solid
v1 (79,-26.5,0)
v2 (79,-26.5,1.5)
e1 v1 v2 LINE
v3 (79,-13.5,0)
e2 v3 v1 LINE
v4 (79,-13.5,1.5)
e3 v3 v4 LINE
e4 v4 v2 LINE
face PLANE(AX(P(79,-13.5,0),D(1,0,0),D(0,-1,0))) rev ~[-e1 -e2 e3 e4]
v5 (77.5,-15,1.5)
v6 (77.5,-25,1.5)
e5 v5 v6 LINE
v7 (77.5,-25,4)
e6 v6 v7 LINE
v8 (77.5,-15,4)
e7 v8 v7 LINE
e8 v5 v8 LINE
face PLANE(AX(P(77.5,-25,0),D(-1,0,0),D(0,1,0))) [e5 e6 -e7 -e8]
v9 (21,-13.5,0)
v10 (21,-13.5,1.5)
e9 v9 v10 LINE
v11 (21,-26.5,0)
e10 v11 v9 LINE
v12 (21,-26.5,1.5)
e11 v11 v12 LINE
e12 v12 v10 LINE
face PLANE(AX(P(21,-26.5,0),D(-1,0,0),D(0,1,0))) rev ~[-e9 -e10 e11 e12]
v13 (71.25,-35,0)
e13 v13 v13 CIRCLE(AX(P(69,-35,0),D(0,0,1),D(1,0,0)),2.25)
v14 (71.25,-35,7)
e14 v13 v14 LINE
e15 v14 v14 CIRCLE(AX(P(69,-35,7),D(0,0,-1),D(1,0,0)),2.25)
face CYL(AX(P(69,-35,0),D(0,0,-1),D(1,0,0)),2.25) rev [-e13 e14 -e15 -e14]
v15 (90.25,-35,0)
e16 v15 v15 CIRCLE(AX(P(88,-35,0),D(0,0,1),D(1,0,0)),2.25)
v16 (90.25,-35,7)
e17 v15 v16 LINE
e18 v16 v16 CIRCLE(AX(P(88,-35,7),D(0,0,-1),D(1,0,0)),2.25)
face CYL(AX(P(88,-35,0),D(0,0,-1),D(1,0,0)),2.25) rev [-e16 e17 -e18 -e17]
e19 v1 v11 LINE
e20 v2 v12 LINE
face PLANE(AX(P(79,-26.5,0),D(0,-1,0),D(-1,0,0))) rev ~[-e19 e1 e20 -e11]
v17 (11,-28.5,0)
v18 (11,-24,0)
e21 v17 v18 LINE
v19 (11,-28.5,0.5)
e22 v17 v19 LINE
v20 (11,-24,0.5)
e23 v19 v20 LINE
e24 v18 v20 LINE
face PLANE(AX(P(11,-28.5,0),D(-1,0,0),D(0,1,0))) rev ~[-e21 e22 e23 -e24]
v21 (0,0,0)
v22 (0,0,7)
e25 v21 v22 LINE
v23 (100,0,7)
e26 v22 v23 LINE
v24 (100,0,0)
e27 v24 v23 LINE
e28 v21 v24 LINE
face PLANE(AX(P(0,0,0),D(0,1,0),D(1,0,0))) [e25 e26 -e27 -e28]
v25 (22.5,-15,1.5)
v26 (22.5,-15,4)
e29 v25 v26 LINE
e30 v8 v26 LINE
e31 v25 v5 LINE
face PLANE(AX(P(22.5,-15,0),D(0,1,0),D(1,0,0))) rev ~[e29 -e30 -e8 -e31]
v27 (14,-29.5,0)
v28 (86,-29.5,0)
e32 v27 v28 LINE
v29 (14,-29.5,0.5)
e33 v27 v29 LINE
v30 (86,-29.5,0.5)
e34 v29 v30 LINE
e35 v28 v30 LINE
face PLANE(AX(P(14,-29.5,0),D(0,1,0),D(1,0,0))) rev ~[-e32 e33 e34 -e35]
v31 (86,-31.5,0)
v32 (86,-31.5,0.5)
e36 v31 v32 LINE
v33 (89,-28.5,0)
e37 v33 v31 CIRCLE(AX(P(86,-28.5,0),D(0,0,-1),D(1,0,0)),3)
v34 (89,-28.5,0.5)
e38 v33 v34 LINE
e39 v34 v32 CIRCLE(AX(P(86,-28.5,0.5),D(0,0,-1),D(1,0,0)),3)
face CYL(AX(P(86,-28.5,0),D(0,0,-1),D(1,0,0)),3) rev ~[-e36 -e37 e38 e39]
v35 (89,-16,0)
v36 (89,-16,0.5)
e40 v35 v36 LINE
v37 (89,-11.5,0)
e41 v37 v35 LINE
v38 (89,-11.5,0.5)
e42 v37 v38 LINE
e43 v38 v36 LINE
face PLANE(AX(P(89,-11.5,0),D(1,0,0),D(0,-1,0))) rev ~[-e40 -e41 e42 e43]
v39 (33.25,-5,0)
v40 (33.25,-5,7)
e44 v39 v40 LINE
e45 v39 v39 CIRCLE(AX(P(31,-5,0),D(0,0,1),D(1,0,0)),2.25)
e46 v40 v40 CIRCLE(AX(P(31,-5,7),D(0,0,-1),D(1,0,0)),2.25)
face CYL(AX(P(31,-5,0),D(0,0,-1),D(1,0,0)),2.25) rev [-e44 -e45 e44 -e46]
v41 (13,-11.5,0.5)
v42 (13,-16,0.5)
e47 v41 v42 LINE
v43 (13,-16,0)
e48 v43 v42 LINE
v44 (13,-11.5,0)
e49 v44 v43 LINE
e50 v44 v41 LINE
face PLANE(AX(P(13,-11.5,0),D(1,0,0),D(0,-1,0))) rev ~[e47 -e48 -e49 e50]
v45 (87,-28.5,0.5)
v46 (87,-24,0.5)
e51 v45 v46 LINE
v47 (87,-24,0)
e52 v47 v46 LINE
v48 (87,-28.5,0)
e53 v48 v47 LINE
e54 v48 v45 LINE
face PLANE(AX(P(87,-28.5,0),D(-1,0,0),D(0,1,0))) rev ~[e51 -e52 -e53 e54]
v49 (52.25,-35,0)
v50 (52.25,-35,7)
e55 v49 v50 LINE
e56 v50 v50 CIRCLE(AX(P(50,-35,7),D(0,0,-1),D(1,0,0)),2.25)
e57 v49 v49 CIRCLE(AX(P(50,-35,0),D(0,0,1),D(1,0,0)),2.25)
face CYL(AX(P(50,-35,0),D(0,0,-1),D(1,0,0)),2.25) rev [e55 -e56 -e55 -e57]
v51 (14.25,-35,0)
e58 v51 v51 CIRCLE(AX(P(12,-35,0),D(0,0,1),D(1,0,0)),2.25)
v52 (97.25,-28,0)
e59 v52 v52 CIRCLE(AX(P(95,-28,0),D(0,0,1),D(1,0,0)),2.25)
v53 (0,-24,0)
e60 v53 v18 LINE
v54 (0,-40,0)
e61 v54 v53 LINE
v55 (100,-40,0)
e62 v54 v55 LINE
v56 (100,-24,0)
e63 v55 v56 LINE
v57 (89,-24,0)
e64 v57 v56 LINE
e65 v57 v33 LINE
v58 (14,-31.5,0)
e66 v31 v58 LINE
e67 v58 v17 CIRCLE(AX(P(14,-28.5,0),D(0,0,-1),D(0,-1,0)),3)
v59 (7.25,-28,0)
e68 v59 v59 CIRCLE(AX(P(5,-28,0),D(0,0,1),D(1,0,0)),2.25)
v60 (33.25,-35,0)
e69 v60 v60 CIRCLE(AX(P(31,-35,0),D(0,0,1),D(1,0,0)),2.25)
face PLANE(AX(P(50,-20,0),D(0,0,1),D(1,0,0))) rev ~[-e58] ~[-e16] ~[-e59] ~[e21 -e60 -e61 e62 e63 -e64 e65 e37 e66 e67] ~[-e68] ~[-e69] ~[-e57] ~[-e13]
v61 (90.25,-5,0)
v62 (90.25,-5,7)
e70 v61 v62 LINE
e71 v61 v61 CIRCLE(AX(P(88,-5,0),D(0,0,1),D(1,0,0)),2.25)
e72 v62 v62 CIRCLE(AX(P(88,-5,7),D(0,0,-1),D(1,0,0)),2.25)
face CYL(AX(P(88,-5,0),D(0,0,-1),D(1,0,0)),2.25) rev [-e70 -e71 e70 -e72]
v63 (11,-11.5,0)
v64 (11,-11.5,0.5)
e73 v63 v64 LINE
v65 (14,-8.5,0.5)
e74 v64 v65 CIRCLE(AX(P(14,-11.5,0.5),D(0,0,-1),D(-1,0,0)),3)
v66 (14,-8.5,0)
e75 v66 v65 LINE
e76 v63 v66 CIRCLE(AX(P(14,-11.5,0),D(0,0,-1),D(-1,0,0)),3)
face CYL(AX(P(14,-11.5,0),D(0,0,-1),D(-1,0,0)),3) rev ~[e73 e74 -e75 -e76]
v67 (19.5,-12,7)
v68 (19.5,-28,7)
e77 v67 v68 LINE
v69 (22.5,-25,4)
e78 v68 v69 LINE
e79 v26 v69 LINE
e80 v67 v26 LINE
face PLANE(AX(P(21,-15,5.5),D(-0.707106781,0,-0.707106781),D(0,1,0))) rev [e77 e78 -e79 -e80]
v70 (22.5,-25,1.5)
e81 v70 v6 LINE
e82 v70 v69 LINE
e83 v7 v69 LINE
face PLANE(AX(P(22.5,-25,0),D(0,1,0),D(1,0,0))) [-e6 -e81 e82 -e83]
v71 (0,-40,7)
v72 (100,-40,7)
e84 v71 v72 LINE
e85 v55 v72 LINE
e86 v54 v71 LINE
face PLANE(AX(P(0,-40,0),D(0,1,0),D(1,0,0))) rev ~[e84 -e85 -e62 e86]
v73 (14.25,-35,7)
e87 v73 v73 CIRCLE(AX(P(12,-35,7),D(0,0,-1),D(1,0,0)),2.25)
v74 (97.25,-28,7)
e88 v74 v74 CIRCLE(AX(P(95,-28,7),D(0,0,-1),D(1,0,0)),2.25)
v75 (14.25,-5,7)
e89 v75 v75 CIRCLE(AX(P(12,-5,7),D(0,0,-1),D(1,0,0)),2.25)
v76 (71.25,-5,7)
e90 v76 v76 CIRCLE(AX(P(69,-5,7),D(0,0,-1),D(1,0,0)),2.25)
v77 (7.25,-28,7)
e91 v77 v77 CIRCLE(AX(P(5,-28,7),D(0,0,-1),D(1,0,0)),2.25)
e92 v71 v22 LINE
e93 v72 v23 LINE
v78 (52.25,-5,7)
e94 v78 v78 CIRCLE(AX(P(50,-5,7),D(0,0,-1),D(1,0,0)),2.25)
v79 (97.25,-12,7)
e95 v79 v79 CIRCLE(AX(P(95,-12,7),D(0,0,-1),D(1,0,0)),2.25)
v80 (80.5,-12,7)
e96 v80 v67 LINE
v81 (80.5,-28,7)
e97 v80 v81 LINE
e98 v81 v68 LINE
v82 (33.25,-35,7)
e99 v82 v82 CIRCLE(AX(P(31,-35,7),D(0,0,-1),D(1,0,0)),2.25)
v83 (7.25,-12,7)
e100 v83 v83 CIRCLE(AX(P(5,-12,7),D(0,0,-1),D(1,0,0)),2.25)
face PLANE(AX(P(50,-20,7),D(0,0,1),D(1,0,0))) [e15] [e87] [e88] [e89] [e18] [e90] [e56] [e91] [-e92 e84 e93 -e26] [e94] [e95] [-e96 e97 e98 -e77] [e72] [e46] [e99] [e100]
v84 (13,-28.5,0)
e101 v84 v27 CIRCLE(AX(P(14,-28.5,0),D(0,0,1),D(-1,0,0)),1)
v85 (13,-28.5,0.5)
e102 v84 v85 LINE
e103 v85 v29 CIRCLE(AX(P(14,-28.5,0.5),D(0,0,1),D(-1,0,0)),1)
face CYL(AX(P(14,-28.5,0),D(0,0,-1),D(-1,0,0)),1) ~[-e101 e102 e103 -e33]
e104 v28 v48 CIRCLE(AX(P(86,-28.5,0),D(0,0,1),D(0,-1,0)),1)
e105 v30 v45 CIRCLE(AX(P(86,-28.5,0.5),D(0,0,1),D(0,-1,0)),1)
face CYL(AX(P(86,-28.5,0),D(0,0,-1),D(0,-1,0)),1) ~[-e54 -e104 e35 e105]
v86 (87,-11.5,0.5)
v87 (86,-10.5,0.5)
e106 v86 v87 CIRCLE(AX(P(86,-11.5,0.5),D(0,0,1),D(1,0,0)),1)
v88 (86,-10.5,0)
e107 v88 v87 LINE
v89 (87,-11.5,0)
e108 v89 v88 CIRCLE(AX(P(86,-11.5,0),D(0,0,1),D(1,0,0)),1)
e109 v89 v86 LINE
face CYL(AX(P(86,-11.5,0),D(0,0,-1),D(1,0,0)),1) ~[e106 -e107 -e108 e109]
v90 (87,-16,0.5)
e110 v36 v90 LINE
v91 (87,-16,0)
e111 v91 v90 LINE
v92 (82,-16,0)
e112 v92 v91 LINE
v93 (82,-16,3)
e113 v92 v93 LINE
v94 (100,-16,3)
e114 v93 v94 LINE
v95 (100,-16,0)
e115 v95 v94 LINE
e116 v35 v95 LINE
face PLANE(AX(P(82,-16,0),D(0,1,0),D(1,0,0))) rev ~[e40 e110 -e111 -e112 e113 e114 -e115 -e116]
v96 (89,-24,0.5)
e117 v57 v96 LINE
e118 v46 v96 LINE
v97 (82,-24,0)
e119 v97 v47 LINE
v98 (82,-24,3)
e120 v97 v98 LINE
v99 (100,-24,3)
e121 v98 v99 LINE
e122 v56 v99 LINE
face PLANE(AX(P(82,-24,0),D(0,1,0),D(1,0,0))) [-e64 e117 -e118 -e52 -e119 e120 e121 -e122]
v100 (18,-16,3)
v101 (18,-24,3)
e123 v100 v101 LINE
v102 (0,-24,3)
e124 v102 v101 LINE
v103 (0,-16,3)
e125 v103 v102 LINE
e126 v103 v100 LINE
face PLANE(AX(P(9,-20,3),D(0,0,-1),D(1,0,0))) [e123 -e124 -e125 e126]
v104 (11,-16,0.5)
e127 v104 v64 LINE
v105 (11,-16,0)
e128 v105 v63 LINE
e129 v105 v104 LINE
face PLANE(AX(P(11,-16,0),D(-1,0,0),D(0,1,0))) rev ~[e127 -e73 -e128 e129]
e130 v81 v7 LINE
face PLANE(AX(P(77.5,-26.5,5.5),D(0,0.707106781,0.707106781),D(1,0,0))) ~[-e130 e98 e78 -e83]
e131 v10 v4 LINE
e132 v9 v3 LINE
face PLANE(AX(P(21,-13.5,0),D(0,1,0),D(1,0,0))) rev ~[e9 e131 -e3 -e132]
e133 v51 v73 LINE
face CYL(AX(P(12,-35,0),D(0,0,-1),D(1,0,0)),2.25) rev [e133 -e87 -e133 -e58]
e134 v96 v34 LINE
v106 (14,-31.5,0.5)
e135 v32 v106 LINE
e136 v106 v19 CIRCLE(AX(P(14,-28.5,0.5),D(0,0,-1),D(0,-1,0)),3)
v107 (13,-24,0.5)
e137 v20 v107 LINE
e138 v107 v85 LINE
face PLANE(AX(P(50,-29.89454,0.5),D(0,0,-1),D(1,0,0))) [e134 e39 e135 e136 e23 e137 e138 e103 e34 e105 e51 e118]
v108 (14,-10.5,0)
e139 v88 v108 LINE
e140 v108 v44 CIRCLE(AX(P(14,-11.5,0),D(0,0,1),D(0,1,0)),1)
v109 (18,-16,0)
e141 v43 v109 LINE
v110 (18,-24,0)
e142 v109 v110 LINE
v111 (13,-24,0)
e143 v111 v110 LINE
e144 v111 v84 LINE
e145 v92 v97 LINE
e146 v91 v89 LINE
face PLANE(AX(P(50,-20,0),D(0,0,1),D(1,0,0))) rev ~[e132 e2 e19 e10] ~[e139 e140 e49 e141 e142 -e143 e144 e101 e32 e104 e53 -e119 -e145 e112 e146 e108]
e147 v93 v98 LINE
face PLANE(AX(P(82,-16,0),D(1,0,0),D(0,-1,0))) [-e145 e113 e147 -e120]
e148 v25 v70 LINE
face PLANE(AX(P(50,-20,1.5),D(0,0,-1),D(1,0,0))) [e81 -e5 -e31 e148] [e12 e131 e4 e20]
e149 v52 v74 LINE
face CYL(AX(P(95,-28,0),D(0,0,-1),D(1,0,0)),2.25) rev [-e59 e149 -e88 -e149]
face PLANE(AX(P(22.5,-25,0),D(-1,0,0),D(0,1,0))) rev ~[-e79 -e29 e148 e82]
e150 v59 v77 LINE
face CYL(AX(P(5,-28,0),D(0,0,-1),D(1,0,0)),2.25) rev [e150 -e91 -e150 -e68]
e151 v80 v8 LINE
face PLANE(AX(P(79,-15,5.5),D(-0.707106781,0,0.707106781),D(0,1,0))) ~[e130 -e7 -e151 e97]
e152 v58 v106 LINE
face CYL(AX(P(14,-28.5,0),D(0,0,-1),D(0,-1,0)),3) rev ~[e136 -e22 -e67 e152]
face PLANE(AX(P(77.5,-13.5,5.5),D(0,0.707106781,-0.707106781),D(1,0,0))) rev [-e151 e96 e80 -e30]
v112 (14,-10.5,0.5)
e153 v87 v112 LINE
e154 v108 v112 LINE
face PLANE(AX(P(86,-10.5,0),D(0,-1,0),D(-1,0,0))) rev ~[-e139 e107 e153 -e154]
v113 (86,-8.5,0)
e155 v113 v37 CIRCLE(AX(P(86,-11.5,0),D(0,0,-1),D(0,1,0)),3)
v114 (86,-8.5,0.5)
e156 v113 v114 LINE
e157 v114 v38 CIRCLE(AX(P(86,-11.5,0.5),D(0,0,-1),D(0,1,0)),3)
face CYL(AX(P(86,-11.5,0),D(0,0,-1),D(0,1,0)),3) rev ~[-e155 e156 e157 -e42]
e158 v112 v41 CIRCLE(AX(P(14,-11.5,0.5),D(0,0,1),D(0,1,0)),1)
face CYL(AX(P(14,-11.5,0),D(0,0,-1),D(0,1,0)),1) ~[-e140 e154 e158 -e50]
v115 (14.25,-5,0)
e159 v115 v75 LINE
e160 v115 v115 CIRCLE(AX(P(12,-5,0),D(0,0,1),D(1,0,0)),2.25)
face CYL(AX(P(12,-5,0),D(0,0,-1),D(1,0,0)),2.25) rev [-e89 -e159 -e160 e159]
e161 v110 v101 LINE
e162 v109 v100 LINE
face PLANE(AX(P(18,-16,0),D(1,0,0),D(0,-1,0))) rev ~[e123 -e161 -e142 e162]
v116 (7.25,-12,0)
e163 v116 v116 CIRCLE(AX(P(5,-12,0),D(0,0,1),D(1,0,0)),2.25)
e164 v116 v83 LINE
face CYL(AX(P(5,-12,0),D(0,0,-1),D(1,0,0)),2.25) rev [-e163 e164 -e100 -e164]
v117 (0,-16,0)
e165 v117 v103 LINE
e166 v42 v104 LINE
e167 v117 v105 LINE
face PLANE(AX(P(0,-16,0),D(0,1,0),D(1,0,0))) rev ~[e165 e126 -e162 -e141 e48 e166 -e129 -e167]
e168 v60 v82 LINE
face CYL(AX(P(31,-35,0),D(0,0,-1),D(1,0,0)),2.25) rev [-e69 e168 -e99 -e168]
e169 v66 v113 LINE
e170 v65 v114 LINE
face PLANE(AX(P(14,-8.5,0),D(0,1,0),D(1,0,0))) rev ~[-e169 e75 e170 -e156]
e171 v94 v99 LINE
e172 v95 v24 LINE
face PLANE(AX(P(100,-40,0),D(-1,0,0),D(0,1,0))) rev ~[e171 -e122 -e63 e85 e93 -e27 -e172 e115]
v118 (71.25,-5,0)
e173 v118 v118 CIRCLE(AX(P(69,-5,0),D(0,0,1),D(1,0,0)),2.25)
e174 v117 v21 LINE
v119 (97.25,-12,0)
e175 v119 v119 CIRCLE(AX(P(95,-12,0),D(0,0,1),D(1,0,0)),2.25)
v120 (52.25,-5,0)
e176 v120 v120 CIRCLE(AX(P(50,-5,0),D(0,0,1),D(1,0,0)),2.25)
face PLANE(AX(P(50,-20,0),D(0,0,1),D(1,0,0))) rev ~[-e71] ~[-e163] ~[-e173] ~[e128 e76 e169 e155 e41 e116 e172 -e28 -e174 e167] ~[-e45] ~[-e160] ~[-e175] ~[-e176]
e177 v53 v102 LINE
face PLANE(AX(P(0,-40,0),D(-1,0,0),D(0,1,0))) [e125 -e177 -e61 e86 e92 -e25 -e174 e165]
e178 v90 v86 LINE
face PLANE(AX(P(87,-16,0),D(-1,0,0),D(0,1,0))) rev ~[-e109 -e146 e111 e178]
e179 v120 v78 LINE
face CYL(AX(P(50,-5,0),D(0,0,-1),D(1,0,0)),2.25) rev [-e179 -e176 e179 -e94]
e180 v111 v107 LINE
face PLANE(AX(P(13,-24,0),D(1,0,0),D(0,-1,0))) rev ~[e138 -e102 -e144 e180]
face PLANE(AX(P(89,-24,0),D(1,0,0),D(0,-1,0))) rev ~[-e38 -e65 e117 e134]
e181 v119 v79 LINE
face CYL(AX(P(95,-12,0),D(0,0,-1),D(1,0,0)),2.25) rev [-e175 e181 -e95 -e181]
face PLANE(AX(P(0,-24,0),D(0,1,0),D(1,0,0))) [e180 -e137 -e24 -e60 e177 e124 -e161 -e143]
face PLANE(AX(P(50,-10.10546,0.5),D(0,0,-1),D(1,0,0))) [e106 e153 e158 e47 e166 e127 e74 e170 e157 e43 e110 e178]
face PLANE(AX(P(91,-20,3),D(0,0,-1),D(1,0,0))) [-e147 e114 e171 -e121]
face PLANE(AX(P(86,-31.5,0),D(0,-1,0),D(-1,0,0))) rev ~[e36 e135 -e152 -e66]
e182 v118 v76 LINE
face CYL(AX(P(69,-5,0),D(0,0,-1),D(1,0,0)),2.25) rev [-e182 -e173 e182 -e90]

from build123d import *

# Parameters (mm, degrees)
F0_W      = 100
F0_H      = 40
F1_DEPTH  = 7
F2_W      = 55
F2_H      = 10
F3_DEPTH  = 8
F4_SIZE   = 3
F5_R      = 2.25
F6_DEPTH  = 18.9
F7_W      = 18
F7_H      = 8
F8_DEPTH  = 3
F9_W      = 55
F9_H      = 10
F10_DEPTH = 1.5
F12_DEPTH = 0.5


# Not quite as in the source:
# - a feature names something its author has since deleted; it is built from what else it names


with BuildPart() as f1:
    # F0 (on Top) → F1 (new body)
    with BuildSketch(Plane.XY):
        with Locations((50, -20)):
            Rectangle(F0_W, F0_H)
    extrude(amount=F1_DEPTH)

    # F2 (on Top) → F3 (cut)
    with BuildSketch(Plane.XY):
        with Locations((50, -20)):
            Rectangle(F2_W, F2_H)
    extrude(amount=F3_DEPTH, mode=Mode.SUBTRACT)

    # F4
    f4_edges = [f1.edges().sort_by_distance(p)[0] for p in [
        (50, -15, 7),
        (22.5, -20, 7),
        (50, -25, 7),
        (77.5, -20, 7),
    ]]
    chamfer(f4_edges, length=F4_SIZE)

    # F5 (on Top) → F6 (cut)
    with BuildSketch(Plane.XY):
        with Locations((12, -35)):
            Circle(F5_R)
        with Locations((31, -35)):
            Circle(F5_R)
        with Locations((50, -35)):
            Circle(F5_R)
        with Locations((69, -35)):
            Circle(F5_R)
        with Locations((88, -35)):
            Circle(F5_R)
        with Locations((95, -28)):
            Circle(F5_R)
        with Locations((95, -12)):
            Circle(F5_R)
        with Locations((88, -5)):
            Circle(F5_R)
        with Locations((69, -5)):
            Circle(F5_R)
        with Locations((50, -5)):
            Circle(F5_R)
        with Locations((31, -5)):
            Circle(F5_R)
        with Locations((12, -5)):
            Circle(F5_R)
        with Locations((5, -12)):
            Circle(F5_R)
        with Locations((5, -28)):
            Circle(F5_R)
    extrude(amount=F6_DEPTH, mode=Mode.SUBTRACT)

    # F7 (on face) → F8 (cut)
    with BuildSketch(Plane(origin=(0, 0, 0), x_dir=(1, 0, 0), z_dir=(0, 0, -1))):
        with Locations((9, 20)):
            Rectangle(F7_W, F7_H)
        with Locations((91, 20)):
            Rectangle(F7_W, F7_H)
    extrude(amount=-F8_DEPTH, mode=Mode.SUBTRACT)

    # F9 (on face) → F10 (cut)
    with BuildSketch(Plane(origin=(0, 0, 0), x_dir=(1, 0, 0), z_dir=(0, 0, -1))):
        Polygon((21, 13.5), (77.5, 13.5), (79, 13.5), (79, 26.5), (21, 26.5), align=None)
        with Locations((50, 20)):
            Rectangle(F9_W, F9_H, mode=Mode.SUBTRACT)
    extrude(amount=-F10_DEPTH, mode=Mode.SUBTRACT)

    # F11 (on face) → F12 (cut)
    with BuildSketch(Plane(origin=(0, 0, 0), x_dir=(1, 0, 0), z_dir=(0, 0, -1))):
        with BuildLine():
            Line((14, 8.5), (16, 8.5))
            Line((16, 8.5), (84, 8.5))
            Line((84, 8.5), (86, 8.5))
            ThreePointArc((86, 8.5), (88.1213203436, 9.3786796564), (89, 11.5))
            Line((89, 11.5), (89, 16))
            Line((89, 16), (87, 16))
            Line((87, 16), (87, 11.5))
            ThreePointArc((87, 11.5), (86.7071067812, 10.7928932188), (86, 10.5))
            Line((86, 10.5), (84, 10.5))
            Line((84, 10.5), (16, 10.5))
            Line((16, 10.5), (14, 10.5))
            ThreePointArc((14, 10.5), (13.2928932188, 10.7928932188), (13, 11.5))
            Line((13, 11.5), (13, 16))
            Line((13, 16), (11, 16))
            Line((11, 16), (11, 11.5))
            ThreePointArc((11, 11.5), (11.8786796564, 9.3786796564), (14, 8.5))
        make_face()
        with BuildLine():
            Line((11, 28.5), (11, 24))
            Line((11, 24), (13, 24))
            Line((13, 24), (13, 28.5))
            ThreePointArc((13, 28.5), (13.2928932188, 29.2071067812), (14, 29.5))
            Line((14, 29.5), (16, 29.5))
            Line((16, 29.5), (84, 29.5))
            Line((84, 29.5), (86, 29.5))
            ThreePointArc((86, 29.5), (86.7071067812, 29.2071067812), (87, 28.5))
            Line((87, 28.5), (87, 24))
            Line((87, 24), (89, 24))
            Line((89, 24), (89, 28.5))
            ThreePointArc((89, 28.5), (88.1213203436, 30.6213203436), (86, 31.5))
            Line((86, 31.5), (84, 31.5))
            Line((84, 31.5), (16, 31.5))
            Line((16, 31.5), (14, 31.5))
            ThreePointArc((14, 31.5), (11.8786796564, 30.6213203436), (11, 28.5))
        make_face()
    extrude(amount=-F12_DEPTH, mode=Mode.SUBTRACT)


solid = f1.part
